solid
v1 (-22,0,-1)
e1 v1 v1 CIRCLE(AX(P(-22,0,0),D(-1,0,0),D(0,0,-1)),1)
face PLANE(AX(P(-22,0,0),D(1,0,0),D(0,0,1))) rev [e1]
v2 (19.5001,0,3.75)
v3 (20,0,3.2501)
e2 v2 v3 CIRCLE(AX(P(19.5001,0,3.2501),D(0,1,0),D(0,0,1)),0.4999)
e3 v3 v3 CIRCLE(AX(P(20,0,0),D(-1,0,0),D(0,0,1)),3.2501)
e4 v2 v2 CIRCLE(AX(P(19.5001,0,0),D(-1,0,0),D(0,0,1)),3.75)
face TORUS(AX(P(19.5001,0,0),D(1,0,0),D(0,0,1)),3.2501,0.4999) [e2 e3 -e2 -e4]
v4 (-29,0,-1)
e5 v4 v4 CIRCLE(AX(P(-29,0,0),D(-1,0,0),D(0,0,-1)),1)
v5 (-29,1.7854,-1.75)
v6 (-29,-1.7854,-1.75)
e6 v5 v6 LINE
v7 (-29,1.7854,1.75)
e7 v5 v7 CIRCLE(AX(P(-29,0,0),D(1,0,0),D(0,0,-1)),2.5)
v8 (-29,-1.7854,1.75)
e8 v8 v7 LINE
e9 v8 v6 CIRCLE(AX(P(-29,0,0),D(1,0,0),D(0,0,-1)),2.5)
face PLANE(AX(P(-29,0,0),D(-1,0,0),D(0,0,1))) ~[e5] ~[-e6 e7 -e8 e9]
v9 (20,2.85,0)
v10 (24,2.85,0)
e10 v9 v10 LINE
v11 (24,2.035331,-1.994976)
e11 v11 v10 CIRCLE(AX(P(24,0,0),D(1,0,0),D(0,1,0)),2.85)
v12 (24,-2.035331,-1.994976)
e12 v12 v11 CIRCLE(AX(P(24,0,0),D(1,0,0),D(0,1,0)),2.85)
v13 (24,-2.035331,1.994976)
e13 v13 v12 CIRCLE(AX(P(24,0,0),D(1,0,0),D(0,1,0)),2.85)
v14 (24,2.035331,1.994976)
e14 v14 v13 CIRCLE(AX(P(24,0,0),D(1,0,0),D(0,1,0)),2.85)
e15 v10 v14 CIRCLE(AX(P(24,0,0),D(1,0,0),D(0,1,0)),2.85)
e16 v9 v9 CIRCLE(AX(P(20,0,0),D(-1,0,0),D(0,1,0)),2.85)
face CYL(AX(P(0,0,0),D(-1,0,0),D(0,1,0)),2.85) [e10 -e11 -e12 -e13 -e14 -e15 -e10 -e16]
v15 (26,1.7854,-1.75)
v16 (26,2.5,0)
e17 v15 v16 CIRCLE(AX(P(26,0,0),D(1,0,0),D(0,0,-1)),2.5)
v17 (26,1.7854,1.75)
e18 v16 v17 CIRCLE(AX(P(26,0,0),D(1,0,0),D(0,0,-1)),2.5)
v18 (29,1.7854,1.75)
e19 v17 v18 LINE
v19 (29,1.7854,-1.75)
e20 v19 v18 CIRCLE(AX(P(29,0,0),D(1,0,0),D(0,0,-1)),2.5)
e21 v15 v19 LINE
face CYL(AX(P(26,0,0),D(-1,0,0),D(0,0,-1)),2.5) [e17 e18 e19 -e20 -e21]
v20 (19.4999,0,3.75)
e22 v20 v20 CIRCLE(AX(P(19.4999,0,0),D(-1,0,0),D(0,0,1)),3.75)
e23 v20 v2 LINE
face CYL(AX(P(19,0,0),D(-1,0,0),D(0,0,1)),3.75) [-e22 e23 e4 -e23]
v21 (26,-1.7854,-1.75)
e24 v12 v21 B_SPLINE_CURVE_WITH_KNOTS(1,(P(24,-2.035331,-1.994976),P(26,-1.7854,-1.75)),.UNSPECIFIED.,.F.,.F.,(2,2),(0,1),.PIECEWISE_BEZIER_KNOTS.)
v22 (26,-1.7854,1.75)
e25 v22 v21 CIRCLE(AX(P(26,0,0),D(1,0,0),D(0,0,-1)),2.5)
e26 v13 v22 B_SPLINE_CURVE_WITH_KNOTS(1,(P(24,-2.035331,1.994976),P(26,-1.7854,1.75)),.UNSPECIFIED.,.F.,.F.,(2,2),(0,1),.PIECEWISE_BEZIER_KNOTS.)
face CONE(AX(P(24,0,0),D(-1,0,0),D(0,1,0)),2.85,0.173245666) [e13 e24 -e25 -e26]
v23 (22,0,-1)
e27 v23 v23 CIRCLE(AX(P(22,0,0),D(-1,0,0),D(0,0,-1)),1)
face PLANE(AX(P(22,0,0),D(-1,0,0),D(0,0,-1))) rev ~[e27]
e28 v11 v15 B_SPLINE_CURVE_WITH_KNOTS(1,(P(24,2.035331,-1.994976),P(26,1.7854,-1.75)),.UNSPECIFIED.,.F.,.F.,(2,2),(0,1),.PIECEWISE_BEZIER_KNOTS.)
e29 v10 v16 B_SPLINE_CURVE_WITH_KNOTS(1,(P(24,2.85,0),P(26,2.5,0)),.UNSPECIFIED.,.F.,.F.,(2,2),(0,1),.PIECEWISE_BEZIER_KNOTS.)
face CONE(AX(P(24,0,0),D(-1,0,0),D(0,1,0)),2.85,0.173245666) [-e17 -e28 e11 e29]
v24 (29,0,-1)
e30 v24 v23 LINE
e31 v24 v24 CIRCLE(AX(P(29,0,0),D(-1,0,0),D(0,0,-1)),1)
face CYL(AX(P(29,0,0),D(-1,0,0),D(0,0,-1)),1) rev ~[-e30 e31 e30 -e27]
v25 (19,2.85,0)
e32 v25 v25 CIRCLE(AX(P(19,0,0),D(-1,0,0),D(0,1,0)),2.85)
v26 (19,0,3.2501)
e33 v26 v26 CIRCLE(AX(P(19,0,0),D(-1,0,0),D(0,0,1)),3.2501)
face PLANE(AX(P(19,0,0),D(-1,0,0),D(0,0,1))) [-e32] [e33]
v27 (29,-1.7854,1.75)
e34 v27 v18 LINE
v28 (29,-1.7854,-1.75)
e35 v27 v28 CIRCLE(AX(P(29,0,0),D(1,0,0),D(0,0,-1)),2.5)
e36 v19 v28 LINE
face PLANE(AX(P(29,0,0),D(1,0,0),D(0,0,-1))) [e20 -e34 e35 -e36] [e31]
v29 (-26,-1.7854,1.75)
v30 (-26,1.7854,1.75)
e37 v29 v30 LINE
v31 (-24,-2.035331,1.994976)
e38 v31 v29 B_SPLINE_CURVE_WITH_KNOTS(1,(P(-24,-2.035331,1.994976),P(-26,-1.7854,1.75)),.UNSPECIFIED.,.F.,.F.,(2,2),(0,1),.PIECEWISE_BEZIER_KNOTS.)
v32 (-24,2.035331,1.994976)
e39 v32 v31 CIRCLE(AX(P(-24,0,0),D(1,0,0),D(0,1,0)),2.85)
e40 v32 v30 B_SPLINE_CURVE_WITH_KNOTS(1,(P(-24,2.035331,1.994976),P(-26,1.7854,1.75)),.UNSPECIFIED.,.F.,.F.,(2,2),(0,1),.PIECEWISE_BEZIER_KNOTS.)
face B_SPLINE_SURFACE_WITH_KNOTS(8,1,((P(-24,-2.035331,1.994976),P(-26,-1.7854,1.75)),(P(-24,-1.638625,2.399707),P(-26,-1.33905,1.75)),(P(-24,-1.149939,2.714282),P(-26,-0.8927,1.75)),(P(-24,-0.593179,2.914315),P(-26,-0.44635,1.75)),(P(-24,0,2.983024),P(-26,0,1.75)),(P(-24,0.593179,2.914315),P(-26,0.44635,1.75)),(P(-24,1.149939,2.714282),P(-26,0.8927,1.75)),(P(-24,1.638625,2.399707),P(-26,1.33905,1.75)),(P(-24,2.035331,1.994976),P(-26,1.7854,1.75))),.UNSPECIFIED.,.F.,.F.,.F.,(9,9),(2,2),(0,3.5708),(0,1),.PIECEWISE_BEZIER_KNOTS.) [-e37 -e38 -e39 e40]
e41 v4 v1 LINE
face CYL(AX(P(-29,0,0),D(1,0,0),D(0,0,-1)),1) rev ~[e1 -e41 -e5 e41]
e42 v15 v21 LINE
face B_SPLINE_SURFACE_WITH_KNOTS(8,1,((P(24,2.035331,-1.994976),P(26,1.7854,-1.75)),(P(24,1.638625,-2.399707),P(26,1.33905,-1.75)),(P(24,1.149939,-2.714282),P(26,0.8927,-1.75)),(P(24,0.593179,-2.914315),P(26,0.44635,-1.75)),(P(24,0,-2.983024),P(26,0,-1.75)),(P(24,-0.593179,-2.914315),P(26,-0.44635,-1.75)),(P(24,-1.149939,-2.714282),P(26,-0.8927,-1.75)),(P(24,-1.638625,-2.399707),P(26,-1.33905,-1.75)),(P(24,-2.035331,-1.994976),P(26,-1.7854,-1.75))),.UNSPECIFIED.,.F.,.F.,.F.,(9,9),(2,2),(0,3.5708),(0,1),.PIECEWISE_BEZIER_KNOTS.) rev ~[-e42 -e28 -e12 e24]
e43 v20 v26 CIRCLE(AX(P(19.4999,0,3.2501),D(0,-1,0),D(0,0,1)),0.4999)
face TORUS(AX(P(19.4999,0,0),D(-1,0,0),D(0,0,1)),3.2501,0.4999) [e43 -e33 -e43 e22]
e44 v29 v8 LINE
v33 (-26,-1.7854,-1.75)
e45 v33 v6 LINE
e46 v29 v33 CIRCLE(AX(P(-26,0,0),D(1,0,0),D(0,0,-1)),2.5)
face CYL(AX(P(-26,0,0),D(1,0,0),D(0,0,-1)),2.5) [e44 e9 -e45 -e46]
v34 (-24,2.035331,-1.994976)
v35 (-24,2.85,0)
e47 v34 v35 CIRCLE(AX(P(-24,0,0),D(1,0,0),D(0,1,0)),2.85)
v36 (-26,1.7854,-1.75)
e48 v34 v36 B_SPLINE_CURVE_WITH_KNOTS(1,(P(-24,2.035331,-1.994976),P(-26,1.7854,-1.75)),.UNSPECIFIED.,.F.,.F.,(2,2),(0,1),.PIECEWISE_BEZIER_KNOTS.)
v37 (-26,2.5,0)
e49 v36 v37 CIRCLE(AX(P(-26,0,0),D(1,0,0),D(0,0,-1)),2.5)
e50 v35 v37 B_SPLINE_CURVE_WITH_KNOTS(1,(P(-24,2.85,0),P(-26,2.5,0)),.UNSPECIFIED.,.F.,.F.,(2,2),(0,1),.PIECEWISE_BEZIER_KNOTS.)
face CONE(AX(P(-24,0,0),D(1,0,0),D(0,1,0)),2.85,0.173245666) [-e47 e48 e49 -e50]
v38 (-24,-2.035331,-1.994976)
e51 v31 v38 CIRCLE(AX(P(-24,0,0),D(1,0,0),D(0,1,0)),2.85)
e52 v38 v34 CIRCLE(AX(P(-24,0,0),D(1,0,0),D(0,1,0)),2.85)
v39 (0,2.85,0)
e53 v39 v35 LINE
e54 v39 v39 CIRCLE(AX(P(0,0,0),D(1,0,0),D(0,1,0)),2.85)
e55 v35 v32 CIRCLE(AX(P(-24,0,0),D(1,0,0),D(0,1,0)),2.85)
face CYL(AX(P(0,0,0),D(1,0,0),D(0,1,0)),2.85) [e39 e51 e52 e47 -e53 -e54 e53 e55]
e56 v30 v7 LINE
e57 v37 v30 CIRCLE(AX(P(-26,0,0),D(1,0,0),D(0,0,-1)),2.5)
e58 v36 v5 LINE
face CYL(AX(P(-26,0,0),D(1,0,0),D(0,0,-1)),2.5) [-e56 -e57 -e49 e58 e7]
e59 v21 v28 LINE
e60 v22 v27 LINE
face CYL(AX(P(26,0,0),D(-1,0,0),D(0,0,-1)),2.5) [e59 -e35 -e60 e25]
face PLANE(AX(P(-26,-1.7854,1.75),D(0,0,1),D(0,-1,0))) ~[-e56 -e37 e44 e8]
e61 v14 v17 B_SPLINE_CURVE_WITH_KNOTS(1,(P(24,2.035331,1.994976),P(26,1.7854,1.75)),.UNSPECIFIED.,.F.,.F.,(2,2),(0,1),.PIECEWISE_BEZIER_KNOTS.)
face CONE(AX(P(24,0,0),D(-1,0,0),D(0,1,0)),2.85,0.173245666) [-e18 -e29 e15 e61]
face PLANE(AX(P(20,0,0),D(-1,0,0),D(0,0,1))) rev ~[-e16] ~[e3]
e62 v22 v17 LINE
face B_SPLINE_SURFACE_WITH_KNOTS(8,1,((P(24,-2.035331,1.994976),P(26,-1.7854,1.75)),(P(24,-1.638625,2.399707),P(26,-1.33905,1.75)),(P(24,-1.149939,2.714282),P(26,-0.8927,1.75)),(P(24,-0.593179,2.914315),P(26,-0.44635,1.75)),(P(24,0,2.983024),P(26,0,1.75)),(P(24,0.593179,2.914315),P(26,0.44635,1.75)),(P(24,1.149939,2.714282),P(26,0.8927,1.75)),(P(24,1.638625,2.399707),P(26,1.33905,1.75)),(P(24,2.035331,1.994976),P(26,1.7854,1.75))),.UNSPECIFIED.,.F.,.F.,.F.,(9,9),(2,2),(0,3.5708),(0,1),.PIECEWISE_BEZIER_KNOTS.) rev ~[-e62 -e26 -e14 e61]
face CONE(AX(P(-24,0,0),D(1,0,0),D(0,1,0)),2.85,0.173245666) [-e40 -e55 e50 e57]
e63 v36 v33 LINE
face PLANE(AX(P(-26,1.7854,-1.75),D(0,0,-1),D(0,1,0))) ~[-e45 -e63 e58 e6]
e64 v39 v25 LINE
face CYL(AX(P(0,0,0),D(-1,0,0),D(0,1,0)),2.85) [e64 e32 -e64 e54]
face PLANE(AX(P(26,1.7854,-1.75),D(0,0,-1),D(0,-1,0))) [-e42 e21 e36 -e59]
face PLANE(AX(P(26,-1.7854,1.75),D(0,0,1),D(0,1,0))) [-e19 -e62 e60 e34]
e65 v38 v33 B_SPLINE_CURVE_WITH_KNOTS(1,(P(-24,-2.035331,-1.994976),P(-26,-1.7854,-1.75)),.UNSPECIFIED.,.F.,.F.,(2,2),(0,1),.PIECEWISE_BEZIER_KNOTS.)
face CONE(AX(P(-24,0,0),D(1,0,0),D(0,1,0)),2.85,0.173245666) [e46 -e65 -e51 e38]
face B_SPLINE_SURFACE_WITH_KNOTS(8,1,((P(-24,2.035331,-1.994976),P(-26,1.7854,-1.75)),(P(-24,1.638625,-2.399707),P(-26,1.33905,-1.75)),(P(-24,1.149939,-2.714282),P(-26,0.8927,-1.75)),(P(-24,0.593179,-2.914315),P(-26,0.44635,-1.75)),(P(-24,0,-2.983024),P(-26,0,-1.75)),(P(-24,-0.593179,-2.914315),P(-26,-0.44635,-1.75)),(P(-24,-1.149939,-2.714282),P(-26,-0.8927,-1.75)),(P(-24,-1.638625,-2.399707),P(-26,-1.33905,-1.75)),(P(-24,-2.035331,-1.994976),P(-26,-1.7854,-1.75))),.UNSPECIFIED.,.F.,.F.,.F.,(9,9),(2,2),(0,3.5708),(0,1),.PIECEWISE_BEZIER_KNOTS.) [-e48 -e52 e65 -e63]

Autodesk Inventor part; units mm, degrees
ref_plane "YZ Plane" through (0, 0, 0) normal (1, 0, 0) x (0, 1, 0)
sketch "Sketch1" plane through (0, 0, 0) normal (1, 0, 0) x (0, 1, 0)
  circle A0 centre (0, 0) radius 2.85
  dimension "diameter" = 5.7
extrude "Shaft" add sketch "Sketch1" along normal mid plane 48
ref_plane "Work Plane1" through (26, 0, 0) normal (1, 0, 0) x (0, 0, -1)
sketch "Sketch3" plane through (26, 0, 0) normal (1, 0, 0) x (0, 0, -1)
  circle A0 centre (0, 0) radius 2.85 construction
  circle A1 centre (0, 0) radius 2.5
  line L0 (-1.75, 1.7854) -> (1.75, 1.7854)
  line L1 (1.75, 1.7854) -> (1.75, -1.7854)
  line L2 (1.75, -1.7854) -> (-1.75, -1.7854)
  line L3 (-1.75, -1.7854) -> (-1.75, 1.7854)
  line L4 (-1.75, 1.7854) -> (1.75, -1.7854) construction
  line L5 (1.75, 1.7854) -> (-1.75, -1.7854) construction
  dimension "d77" = 5
  dimension "d76" = 3.5
extrude "Wheel Insert Profile" add sketch "Sketch3" along normal blind 3 contours L0 A1 | L1 L2 L3 L0 | A1 L2
loft "Loft1" add section 1 edges at (24, -2.85, 0) section 2 edges at (26, 0, 1.75) (26, 2.5, 0) (26, 0, -1.75) (26, -2.5, 0)
ref_plane "Work Plane2" through (19, 0, 0) normal (-1, 0, 0) x (0, 0, 1)
sketch "Sketch4" plane through (19, 0, 0) normal (-1, 0, 0) x (0, 0, 1)
  circle A0 centre (0, 0) radius 3.75
  dimension "d35" = 7.5
extrude "Stopper" add sketch "Sketch4" against normal blind 1
fillet "Fillet1" radius 0.5 2 edges at (19, 0, -3.75) (20, 0, -3.75)
sketch "Sketch9" plane through (29, 0, 0) normal (1, 0, 0) x (0, 0, -1)
  arc A0 (1.75, 1.7854) -> (-1.75, 1.7854) centre (0, 0) ccw projected
hole "Hole1" at (29, 0, 0) direction (-1, 0, 0) diameter 2 depth 7
mirror "Mirror1" about plane through (0, 0, 0) normal (1, 0, 0) of "Loft1", "Wheel Insert Profile", "Hole1"
properties part number "front shaft v3"
